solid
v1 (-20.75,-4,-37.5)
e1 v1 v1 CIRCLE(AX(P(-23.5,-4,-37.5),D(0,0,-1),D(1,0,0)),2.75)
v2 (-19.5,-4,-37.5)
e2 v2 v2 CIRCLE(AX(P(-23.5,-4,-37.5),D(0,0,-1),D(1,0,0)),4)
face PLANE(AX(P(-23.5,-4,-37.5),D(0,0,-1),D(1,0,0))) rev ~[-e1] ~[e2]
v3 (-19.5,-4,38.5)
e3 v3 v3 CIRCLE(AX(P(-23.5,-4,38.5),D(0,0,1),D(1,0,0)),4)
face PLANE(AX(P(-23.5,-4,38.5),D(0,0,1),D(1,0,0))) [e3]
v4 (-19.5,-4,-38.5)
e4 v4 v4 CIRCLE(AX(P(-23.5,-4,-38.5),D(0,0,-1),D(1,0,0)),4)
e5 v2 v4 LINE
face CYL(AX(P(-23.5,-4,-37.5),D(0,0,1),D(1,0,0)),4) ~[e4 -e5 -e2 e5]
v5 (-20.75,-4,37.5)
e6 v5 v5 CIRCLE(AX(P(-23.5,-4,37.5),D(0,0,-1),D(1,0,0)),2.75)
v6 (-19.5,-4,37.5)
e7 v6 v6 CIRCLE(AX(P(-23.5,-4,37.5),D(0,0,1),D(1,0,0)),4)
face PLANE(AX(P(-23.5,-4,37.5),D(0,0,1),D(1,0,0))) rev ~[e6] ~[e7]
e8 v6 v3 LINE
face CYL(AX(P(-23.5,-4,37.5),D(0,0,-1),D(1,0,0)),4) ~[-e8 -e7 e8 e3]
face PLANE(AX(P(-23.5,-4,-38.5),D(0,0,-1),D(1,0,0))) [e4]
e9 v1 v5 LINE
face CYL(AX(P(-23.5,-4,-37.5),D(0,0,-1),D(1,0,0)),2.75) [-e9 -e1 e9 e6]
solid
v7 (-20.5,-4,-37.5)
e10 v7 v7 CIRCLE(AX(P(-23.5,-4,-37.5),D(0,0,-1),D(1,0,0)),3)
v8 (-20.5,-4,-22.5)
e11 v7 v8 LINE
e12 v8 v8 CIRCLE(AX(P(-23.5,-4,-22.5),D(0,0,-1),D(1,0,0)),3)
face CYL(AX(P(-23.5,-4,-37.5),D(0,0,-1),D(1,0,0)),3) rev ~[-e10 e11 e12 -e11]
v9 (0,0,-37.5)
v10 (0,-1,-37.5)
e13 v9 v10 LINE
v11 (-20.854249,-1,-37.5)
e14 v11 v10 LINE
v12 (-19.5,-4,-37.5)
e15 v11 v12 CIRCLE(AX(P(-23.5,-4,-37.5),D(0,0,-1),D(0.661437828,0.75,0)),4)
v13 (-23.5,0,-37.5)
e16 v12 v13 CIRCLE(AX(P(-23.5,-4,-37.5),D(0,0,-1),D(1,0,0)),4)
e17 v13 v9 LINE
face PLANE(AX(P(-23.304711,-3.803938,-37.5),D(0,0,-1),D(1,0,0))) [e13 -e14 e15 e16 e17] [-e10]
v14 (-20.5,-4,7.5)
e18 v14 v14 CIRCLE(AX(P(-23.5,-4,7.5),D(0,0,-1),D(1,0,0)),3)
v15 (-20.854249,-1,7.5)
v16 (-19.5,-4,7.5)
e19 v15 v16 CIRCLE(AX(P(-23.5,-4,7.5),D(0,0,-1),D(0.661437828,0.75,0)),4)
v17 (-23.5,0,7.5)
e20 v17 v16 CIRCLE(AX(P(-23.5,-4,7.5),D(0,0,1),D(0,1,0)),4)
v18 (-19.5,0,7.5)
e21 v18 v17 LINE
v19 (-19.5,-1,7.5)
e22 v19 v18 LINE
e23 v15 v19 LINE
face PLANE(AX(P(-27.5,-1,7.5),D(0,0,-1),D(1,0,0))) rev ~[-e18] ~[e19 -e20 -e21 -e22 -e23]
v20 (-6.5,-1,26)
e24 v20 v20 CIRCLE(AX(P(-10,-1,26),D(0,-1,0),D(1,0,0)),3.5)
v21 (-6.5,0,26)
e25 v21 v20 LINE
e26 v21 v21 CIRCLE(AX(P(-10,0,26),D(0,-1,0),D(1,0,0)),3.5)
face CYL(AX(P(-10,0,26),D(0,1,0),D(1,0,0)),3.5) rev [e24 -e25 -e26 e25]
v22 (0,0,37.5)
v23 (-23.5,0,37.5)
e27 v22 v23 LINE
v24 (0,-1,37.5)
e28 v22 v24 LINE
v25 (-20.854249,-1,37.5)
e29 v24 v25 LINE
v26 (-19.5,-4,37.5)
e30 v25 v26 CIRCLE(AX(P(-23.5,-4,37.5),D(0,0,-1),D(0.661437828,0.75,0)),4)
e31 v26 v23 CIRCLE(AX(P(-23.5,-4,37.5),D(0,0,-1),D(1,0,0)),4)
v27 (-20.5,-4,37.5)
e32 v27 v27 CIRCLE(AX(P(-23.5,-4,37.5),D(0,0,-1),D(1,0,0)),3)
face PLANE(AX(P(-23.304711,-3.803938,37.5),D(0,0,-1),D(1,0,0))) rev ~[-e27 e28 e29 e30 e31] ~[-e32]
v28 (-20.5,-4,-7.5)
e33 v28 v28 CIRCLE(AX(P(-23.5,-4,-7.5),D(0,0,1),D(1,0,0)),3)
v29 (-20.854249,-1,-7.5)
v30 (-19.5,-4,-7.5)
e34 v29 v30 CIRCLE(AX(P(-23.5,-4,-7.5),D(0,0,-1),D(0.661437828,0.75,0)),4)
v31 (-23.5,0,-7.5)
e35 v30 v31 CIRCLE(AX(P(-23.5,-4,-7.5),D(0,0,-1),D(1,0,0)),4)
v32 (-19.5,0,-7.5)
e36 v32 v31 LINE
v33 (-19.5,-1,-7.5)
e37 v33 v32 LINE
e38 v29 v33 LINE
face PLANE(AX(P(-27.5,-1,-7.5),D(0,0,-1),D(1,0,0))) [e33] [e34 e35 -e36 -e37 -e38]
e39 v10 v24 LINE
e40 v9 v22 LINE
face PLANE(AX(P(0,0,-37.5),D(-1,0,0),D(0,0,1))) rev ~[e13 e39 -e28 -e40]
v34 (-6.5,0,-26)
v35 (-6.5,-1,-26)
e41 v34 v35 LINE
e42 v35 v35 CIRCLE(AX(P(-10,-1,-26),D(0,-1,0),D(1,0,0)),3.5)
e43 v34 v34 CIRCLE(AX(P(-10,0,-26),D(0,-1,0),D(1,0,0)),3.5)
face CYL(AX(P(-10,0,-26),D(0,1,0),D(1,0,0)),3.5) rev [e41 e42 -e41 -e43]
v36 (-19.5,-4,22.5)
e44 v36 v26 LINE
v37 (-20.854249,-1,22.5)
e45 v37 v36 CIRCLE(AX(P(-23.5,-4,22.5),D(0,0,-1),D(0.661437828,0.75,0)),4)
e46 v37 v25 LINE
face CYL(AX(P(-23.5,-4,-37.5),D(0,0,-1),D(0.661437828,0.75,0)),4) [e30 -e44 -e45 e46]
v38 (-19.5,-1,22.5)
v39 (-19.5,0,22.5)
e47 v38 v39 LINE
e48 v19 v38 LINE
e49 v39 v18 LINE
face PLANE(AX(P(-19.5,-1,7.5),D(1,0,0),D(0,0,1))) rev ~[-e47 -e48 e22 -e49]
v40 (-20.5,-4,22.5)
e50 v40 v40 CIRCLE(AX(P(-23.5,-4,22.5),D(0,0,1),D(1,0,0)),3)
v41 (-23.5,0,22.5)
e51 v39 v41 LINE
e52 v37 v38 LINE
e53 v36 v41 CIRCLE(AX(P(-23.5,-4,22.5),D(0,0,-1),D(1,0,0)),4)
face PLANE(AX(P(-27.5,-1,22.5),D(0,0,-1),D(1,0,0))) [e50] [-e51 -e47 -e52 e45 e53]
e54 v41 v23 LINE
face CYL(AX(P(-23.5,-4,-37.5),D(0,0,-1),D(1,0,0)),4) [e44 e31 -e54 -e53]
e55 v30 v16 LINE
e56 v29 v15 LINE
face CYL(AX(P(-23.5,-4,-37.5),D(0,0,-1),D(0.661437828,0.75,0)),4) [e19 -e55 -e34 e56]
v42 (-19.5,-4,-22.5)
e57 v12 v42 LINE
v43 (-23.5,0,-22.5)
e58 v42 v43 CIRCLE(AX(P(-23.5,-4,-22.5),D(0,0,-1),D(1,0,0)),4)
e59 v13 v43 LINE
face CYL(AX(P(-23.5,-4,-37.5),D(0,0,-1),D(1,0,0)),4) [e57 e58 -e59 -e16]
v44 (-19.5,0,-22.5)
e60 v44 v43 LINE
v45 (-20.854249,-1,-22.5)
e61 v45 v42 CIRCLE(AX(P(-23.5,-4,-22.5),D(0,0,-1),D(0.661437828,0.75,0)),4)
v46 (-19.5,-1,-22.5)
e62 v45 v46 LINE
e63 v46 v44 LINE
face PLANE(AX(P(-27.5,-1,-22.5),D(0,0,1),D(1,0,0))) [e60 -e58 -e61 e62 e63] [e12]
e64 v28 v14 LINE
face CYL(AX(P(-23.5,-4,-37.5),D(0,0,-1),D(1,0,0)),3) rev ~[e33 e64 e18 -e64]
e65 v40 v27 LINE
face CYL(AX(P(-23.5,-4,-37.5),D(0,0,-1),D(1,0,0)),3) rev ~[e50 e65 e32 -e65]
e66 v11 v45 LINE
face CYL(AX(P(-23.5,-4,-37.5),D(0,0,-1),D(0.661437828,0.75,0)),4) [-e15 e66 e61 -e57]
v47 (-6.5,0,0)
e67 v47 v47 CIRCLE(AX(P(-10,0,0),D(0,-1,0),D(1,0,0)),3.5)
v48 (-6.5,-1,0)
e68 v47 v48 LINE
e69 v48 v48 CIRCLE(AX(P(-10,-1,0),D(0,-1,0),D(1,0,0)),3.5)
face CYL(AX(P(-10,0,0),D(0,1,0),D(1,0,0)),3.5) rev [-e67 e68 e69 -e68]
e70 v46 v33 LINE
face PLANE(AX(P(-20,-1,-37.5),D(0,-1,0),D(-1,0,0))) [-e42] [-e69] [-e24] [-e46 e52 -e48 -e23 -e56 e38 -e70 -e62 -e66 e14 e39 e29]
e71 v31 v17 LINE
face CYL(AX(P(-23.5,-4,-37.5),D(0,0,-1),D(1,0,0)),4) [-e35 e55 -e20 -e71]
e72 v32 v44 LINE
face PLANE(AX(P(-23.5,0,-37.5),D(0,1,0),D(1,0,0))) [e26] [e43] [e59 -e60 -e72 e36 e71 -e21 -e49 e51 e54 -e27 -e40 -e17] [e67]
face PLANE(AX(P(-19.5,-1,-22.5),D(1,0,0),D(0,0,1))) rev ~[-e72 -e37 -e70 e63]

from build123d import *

# Parameters (mm, degrees)
F0_W          = 20
F0_H          = 75
F0_R          = 3.5
F1_DEPTH      = 1
F2_R          = 3
F3_DEPTH      = 75
F4_W          = 8
F4_H          = 15
F5_DEPTH      = 1.001
F5_DEPTH_BACK = 7.001
F6_R          = 2.75
F7_DEPTH      = 75
F8_R          = 4
F9_DEPTH      = 1
F10_R         = 4
F11_DEPTH     = 1


with BuildPart() as f1:
    # F0 (on Front) → F1 (new body)
    with BuildSketch(Plane.XZ):
        with Locations((-10, 0)):
            Rectangle(F0_W, F0_H)
        with Locations((-10, -26)):
            Circle(F0_R, mode=Mode.SUBTRACT)
        with Locations((-10, 0)):
            Circle(F0_R, mode=Mode.SUBTRACT)
        with Locations((-10, 26)):
            Circle(F0_R, mode=Mode.SUBTRACT)
    extrude(amount=F1_DEPTH)

    # F2 (on face) → F3 (join, through all)
    with BuildSketch(Plane(origin=(0, 0, -37.5), x_dir=(1, 0, 0), z_dir=(0, 0, -1))):
        with BuildLine():
            ThreePointArc((-20.8542486889, 1), (-19.8542486889, 2.3542486889), (-19.5, 4))
            ThreePointArc((-19.5, 4), (-26.3284271247, 6.8284271247), (-23.5, 0))
            ThreePointArc((-23.5, 0), (-22.0857864376, 0.2583426132), (-20.8542486889, 1))
        make_face()
        with Locations((-23.5, 4)):
            Circle(F2_R, mode=Mode.SUBTRACT)
        with BuildLine():
            ThreePointArc((-20.8542486889, 1), (-22.0857864376, 0.2583426132), (-23.5, 0))
            Line((-23.5, 0), (-20, 0))
            Line((-20, 0), (-20, 1))
            Line((-20, 1), (-20.8542486889, 1))
        make_face()
    extrude(amount=-F3_DEPTH)

    # F4 (on face) → F5 (cut, two sides)
    with BuildSketch(Plane.XZ.offset(1)) as f5_sk:
        with Locations((-23.5, -15)):
            Rectangle(F4_W, F4_H)
        with Locations((-23.5, 15)):
            Rectangle(F4_W, F4_H)
    extrude(amount=-F5_DEPTH, mode=Mode.SUBTRACT)
    extrude(f5_sk.sketch, amount=F5_DEPTH_BACK, mode=Mode.SUBTRACT)


with BuildPart() as f7:
    # F6 (on face) → F7 (new body, through all)
    with BuildSketch(Plane(origin=(0, 0, -37.5), x_dir=(1, 0, 0), z_dir=(0, 0, -1))):
        with Locations((-23.5, 4)):
            Circle(F6_R)
    extrude(amount=-F7_DEPTH)

    # F8 (on face) → F9 (join)
    with BuildSketch(Plane.XY.offset(37.5)):
        with Locations((-23.5, -4)):
            Circle(F8_R)
    extrude(amount=F9_DEPTH)

    # F10 (on face) → F11 (join)
    with BuildSketch(Plane(origin=(0, 0, -37.5), x_dir=(1, 0, 0), z_dir=(0, 0, -1))):
        with Locations((-23.5, 4)):
            Circle(F10_R)
    extrude(amount=F11_DEPTH)


solid = Compound([f1.part, f7.part])
